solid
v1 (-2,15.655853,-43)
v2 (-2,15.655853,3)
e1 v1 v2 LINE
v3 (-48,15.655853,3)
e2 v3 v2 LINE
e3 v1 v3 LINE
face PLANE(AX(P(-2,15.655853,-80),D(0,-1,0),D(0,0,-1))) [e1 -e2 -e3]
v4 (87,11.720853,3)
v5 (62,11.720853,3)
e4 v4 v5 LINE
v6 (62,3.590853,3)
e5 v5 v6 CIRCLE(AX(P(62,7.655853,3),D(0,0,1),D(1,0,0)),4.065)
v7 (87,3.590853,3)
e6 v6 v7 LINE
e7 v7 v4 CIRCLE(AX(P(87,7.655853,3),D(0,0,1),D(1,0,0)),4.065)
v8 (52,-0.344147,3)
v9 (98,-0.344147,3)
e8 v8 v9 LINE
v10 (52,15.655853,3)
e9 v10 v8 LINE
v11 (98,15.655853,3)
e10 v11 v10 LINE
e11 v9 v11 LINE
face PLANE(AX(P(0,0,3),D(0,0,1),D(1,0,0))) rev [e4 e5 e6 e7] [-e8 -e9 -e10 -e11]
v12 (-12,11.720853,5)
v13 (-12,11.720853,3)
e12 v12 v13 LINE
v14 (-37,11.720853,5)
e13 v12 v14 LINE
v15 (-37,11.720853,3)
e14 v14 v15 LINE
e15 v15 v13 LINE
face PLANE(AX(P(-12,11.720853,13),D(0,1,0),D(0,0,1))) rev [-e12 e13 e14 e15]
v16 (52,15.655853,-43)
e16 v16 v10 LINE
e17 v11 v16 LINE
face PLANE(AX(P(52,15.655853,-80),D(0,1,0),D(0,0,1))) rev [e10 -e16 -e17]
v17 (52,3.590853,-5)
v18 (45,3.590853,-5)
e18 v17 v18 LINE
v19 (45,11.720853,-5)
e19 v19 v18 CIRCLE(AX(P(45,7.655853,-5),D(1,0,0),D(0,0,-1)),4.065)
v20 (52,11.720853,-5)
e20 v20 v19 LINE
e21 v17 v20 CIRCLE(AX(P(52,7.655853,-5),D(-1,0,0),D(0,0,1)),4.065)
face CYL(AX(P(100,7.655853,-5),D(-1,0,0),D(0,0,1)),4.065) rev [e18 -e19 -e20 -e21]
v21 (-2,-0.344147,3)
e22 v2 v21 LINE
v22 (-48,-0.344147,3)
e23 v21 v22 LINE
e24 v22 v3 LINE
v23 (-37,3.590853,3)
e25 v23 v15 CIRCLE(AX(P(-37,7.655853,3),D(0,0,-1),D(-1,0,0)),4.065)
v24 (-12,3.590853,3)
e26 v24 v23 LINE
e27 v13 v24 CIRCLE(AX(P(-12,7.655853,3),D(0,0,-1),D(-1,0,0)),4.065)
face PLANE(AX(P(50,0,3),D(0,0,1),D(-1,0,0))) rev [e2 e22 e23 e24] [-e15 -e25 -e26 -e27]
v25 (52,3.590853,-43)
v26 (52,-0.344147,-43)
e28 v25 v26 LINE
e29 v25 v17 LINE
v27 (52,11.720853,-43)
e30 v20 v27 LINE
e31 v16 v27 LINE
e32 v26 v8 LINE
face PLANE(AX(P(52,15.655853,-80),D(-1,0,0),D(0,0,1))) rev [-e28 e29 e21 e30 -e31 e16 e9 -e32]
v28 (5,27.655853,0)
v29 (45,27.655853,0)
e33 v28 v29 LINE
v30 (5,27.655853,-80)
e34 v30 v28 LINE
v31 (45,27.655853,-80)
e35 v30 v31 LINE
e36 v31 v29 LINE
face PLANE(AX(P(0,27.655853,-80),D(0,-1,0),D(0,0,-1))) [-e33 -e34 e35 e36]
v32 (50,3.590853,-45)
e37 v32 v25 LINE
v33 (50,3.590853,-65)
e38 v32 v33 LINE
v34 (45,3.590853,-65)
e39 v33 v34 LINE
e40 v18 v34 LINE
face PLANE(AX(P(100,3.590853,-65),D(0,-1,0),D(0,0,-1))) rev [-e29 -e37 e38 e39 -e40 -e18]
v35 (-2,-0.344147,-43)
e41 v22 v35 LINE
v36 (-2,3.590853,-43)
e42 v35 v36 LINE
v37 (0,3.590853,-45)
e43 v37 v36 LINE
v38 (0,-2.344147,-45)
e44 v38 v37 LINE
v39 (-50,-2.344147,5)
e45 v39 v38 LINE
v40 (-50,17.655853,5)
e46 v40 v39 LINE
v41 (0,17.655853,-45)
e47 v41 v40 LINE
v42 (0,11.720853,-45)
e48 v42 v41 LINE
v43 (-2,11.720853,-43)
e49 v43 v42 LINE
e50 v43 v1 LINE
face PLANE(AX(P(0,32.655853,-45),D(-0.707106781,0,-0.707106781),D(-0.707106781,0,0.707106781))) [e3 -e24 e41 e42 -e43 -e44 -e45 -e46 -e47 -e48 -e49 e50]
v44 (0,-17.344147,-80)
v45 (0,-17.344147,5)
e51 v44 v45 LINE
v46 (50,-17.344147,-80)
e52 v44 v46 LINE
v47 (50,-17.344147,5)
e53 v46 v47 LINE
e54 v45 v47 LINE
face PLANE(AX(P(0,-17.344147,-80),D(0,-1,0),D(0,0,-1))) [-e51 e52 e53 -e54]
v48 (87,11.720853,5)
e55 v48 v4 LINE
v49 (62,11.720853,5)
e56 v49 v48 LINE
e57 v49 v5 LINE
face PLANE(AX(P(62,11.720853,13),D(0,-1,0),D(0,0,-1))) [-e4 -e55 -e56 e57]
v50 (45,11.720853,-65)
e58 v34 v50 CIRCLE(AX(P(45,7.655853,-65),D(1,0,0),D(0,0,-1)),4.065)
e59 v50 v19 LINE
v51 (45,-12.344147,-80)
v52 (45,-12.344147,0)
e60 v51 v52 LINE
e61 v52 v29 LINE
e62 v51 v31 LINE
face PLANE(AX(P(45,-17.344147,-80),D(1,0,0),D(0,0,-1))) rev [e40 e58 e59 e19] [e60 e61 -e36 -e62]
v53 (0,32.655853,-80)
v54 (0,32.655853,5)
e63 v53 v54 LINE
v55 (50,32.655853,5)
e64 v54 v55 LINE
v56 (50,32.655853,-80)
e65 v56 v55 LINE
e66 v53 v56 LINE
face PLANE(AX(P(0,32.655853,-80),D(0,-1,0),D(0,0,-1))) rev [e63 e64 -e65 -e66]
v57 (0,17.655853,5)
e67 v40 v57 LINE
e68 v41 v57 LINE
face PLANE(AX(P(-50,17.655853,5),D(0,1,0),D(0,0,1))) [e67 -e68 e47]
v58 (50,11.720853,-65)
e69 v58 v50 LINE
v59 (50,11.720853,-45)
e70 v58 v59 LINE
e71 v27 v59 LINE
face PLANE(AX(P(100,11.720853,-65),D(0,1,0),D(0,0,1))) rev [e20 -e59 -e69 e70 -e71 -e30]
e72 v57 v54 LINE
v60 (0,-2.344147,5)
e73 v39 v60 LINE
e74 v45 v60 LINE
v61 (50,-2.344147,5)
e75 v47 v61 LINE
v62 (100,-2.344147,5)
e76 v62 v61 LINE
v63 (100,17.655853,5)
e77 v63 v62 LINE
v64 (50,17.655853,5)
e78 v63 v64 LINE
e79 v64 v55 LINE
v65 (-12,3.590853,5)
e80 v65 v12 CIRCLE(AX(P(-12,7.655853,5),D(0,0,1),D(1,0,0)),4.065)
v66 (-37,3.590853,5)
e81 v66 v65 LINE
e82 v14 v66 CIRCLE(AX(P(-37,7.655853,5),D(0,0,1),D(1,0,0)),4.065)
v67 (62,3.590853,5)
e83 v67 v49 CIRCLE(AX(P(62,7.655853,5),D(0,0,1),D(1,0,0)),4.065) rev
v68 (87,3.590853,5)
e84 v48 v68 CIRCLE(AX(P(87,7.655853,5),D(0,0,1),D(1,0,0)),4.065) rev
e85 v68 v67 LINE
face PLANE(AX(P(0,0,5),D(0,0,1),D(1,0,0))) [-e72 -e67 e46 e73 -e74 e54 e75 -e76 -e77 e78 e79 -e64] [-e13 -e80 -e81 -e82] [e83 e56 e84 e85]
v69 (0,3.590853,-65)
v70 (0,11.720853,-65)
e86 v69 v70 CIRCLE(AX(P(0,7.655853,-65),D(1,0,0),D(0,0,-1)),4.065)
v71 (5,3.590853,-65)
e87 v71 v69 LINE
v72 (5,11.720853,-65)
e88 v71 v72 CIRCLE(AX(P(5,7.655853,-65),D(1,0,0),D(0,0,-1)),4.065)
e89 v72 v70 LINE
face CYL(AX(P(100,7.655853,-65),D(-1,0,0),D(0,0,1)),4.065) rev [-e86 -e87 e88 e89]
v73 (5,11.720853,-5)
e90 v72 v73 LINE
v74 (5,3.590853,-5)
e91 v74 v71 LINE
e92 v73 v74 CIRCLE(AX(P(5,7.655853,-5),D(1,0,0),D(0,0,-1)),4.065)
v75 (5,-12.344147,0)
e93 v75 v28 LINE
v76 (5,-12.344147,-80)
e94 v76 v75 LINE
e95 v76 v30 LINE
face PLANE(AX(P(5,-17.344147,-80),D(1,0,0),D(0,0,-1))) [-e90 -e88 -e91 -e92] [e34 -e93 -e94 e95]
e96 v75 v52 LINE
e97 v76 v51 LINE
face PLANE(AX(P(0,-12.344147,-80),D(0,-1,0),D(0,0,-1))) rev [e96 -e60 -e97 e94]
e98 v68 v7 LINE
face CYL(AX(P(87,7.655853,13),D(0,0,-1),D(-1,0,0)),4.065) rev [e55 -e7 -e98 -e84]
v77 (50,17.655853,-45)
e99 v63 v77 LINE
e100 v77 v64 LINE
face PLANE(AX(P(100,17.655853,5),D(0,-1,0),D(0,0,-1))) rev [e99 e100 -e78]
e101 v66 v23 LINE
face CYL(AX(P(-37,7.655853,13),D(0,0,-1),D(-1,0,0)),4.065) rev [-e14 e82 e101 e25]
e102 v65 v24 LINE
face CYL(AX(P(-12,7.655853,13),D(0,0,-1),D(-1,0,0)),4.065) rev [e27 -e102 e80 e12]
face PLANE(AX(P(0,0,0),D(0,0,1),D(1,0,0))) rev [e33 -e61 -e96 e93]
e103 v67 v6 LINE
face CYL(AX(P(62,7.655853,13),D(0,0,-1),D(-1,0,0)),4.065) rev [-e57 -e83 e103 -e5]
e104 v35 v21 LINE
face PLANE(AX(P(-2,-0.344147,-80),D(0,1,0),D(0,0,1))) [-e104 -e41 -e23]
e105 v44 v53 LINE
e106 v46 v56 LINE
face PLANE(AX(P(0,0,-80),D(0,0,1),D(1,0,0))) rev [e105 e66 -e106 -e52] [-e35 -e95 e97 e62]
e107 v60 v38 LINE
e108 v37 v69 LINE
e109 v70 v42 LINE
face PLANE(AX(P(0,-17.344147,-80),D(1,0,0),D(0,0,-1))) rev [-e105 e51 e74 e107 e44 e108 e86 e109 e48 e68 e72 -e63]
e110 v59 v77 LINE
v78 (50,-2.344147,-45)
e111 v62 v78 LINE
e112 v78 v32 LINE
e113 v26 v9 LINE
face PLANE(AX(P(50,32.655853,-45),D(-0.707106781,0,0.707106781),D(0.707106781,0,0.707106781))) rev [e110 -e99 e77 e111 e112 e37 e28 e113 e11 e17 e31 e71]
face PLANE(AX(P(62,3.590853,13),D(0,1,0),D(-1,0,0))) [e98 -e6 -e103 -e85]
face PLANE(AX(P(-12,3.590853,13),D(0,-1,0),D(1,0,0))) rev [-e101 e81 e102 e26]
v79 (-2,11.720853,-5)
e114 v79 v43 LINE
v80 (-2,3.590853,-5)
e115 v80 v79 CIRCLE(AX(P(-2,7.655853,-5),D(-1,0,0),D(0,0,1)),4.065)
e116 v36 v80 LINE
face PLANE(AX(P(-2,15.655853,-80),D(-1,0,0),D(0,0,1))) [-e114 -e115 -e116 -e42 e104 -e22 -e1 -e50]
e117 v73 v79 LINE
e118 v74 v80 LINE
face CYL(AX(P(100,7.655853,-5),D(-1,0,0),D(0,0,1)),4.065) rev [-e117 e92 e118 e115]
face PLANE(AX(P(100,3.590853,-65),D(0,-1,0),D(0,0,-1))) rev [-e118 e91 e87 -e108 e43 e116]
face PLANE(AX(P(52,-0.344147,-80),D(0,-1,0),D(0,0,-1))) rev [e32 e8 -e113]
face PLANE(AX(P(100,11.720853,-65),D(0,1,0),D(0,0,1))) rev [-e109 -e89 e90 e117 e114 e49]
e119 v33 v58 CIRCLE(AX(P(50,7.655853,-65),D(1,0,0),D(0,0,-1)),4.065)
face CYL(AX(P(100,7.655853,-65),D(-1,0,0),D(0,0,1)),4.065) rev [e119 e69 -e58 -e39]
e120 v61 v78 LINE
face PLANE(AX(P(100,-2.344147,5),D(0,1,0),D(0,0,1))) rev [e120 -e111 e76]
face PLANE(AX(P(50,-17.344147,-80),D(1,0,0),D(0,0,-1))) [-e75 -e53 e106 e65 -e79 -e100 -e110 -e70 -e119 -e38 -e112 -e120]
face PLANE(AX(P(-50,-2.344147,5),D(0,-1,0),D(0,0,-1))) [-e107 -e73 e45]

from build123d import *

# Parameters (mm, degrees)
BOSS_EXTRU_1_DEPTH      = 5
BOSS_EXTRU_1_DEPTH_BACK = 80
ESQUISSE1_W             = 50
ESQUISSE1_H             = 50
BOSS_EXTRU_2_DEPTH      = 50
ENL_V_MAT_EXTRU_2_DEPTH = 133.759180474
COQUE1_START            = -12.344146878
COQUE1_OUTLINE_W        = 40
COQUE1_OUTLINE_H        = 80
COQUE1_DEPTH            = 40
ENL_V_MAT_EXTRU_5_DEPTH = 134.997778874
ENL_V_MAT_EXTRU_6_DEPTH = 10
ENL_V_MAT_EXTRU_7_DEPTH = 134.68023318


# Read off the part's stored shape, not the designer's step: Coque1
with BuildPart() as part:
    # Esquisse1 → Boss.-Extru.1 (new, two sides: drawn at the far end of the back side and taken through both)
    with BuildSketch(Plane.XY.offset(-BOSS_EXTRU_1_DEPTH_BACK)):
        with Locations((25, 7.655853122)):
            Rectangle(ESQUISSE1_W, ESQUISSE1_H)
    extrude(amount=BOSS_EXTRU_1_DEPTH + BOSS_EXTRU_1_DEPTH_BACK)

    # Esquisse2 → Boss.-Extru.2 (add)
    with BuildSketch(Plane(origin=(50, 0, 0), x_dir=(0, 0, -1), z_dir=(1, 0, 0))):
        Polygon((-5, 17.655853122), (45, 17.655853122), (45, -2.344146878), (-5, -2.344146878), (-5, 7.655853122), align=None)
    boss_extru_2 = extrude(amount=BOSS_EXTRU_2_DEPTH)

    # Esquisse5 → Enlèv. mat.-Extru.2 (cut, through all)
    with BuildSketch(Plane.XZ.offset(2.344146878)):
        Polygon((50, -45), (100, 5), (100, -45), align=None)
    enl_v_mat_extru_2 = extrude(amount=-ENL_V_MAT_EXTRU_2_DEPTH, mode=Mode.SUBTRACT)

    # Symétrie2: Boss.-Extru.2, Enlèv. mat.-Extru.2 across plane
    add(boss_extru_2.mirror(Plane.ZY.offset(-25)))
    add(enl_v_mat_extru_2.mirror(Plane.ZY.offset(-25)), mode=Mode.SUBTRACT)

    # Coque1 outline → Coque1 (cut)
    with BuildSketch(Plane(origin=(0, 0, 0), x_dir=(1, 0, 0), z_dir=(0, 1, 0)).offset(COQUE1_START)):
        with Locations((25, 40)):
            Rectangle(COQUE1_OUTLINE_W, COQUE1_OUTLINE_H)
    extrude(amount=COQUE1_DEPTH, mode=Mode.SUBTRACT)

    # Esquisse16 → Enlèv. mat.-Extru.5 (cut, through all)
    with BuildSketch(Plane.XY.offset(3)):
        Polygon((52, 15.655853122), (98, 15.655853122), (98, 7.655853122), (98, -0.344146878), (52, -0.344146878), align=None)
    enl_v_mat_extru_5 = extrude(amount=-ENL_V_MAT_EXTRU_5_DEPTH, mode=Mode.SUBTRACT)

    # Symétrie8: Enlèv. mat.-Extru.5 across plane
    add(enl_v_mat_extru_5.mirror(Plane.ZY.offset(-25)), mode=Mode.SUBTRACT)

    # Esquisse17 → Enlèv. mat.-Extru.6 (cut)
    with BuildSketch(Plane(origin=(0, 0, 3), x_dir=(-1, 0, 0), z_dir=(0, 0, -1))):
        with BuildLine():
            Line((12, 11.720853122), (37, 11.720853122))
            ThreePointArc((37, 11.720853122), (41.065, 7.655853122), (37, 3.590853122))
            Line((37, 3.590853122), (12, 3.590853122))
            ThreePointArc((12, 3.590853122), (7.935, 7.655853122), (12, 11.720853122))
        make_face()
    enl_v_mat_extru_6 = extrude(amount=-ENL_V_MAT_EXTRU_6_DEPTH, mode=Mode.SUBTRACT)

    # Symétrie9: Enlèv. mat.-Extru.6 across plane
    add(enl_v_mat_extru_6.mirror(Plane.ZY.offset(-25)), mode=Mode.SUBTRACT)

    # Esquisse18 → Enlèv. mat.-Extru.7 (cut, through all)
    with BuildSketch(Plane.ZY.offset(2)):
        with BuildLine():
            Line((-65, 11.720853122), (-5, 11.720853122))
            ThreePointArc((-5, 11.720853122), (-0.935, 7.655853122), (-5, 3.590853122))
            Line((-5, 3.590853122), (-65, 3.590853122))
            ThreePointArc((-65, 3.590853122), (-69.065, 7.655853122), (-65, 11.720853122))
        make_face()
    extrude(amount=-ENL_V_MAT_EXTRU_7_DEPTH, mode=Mode.SUBTRACT)


solid = part.part
